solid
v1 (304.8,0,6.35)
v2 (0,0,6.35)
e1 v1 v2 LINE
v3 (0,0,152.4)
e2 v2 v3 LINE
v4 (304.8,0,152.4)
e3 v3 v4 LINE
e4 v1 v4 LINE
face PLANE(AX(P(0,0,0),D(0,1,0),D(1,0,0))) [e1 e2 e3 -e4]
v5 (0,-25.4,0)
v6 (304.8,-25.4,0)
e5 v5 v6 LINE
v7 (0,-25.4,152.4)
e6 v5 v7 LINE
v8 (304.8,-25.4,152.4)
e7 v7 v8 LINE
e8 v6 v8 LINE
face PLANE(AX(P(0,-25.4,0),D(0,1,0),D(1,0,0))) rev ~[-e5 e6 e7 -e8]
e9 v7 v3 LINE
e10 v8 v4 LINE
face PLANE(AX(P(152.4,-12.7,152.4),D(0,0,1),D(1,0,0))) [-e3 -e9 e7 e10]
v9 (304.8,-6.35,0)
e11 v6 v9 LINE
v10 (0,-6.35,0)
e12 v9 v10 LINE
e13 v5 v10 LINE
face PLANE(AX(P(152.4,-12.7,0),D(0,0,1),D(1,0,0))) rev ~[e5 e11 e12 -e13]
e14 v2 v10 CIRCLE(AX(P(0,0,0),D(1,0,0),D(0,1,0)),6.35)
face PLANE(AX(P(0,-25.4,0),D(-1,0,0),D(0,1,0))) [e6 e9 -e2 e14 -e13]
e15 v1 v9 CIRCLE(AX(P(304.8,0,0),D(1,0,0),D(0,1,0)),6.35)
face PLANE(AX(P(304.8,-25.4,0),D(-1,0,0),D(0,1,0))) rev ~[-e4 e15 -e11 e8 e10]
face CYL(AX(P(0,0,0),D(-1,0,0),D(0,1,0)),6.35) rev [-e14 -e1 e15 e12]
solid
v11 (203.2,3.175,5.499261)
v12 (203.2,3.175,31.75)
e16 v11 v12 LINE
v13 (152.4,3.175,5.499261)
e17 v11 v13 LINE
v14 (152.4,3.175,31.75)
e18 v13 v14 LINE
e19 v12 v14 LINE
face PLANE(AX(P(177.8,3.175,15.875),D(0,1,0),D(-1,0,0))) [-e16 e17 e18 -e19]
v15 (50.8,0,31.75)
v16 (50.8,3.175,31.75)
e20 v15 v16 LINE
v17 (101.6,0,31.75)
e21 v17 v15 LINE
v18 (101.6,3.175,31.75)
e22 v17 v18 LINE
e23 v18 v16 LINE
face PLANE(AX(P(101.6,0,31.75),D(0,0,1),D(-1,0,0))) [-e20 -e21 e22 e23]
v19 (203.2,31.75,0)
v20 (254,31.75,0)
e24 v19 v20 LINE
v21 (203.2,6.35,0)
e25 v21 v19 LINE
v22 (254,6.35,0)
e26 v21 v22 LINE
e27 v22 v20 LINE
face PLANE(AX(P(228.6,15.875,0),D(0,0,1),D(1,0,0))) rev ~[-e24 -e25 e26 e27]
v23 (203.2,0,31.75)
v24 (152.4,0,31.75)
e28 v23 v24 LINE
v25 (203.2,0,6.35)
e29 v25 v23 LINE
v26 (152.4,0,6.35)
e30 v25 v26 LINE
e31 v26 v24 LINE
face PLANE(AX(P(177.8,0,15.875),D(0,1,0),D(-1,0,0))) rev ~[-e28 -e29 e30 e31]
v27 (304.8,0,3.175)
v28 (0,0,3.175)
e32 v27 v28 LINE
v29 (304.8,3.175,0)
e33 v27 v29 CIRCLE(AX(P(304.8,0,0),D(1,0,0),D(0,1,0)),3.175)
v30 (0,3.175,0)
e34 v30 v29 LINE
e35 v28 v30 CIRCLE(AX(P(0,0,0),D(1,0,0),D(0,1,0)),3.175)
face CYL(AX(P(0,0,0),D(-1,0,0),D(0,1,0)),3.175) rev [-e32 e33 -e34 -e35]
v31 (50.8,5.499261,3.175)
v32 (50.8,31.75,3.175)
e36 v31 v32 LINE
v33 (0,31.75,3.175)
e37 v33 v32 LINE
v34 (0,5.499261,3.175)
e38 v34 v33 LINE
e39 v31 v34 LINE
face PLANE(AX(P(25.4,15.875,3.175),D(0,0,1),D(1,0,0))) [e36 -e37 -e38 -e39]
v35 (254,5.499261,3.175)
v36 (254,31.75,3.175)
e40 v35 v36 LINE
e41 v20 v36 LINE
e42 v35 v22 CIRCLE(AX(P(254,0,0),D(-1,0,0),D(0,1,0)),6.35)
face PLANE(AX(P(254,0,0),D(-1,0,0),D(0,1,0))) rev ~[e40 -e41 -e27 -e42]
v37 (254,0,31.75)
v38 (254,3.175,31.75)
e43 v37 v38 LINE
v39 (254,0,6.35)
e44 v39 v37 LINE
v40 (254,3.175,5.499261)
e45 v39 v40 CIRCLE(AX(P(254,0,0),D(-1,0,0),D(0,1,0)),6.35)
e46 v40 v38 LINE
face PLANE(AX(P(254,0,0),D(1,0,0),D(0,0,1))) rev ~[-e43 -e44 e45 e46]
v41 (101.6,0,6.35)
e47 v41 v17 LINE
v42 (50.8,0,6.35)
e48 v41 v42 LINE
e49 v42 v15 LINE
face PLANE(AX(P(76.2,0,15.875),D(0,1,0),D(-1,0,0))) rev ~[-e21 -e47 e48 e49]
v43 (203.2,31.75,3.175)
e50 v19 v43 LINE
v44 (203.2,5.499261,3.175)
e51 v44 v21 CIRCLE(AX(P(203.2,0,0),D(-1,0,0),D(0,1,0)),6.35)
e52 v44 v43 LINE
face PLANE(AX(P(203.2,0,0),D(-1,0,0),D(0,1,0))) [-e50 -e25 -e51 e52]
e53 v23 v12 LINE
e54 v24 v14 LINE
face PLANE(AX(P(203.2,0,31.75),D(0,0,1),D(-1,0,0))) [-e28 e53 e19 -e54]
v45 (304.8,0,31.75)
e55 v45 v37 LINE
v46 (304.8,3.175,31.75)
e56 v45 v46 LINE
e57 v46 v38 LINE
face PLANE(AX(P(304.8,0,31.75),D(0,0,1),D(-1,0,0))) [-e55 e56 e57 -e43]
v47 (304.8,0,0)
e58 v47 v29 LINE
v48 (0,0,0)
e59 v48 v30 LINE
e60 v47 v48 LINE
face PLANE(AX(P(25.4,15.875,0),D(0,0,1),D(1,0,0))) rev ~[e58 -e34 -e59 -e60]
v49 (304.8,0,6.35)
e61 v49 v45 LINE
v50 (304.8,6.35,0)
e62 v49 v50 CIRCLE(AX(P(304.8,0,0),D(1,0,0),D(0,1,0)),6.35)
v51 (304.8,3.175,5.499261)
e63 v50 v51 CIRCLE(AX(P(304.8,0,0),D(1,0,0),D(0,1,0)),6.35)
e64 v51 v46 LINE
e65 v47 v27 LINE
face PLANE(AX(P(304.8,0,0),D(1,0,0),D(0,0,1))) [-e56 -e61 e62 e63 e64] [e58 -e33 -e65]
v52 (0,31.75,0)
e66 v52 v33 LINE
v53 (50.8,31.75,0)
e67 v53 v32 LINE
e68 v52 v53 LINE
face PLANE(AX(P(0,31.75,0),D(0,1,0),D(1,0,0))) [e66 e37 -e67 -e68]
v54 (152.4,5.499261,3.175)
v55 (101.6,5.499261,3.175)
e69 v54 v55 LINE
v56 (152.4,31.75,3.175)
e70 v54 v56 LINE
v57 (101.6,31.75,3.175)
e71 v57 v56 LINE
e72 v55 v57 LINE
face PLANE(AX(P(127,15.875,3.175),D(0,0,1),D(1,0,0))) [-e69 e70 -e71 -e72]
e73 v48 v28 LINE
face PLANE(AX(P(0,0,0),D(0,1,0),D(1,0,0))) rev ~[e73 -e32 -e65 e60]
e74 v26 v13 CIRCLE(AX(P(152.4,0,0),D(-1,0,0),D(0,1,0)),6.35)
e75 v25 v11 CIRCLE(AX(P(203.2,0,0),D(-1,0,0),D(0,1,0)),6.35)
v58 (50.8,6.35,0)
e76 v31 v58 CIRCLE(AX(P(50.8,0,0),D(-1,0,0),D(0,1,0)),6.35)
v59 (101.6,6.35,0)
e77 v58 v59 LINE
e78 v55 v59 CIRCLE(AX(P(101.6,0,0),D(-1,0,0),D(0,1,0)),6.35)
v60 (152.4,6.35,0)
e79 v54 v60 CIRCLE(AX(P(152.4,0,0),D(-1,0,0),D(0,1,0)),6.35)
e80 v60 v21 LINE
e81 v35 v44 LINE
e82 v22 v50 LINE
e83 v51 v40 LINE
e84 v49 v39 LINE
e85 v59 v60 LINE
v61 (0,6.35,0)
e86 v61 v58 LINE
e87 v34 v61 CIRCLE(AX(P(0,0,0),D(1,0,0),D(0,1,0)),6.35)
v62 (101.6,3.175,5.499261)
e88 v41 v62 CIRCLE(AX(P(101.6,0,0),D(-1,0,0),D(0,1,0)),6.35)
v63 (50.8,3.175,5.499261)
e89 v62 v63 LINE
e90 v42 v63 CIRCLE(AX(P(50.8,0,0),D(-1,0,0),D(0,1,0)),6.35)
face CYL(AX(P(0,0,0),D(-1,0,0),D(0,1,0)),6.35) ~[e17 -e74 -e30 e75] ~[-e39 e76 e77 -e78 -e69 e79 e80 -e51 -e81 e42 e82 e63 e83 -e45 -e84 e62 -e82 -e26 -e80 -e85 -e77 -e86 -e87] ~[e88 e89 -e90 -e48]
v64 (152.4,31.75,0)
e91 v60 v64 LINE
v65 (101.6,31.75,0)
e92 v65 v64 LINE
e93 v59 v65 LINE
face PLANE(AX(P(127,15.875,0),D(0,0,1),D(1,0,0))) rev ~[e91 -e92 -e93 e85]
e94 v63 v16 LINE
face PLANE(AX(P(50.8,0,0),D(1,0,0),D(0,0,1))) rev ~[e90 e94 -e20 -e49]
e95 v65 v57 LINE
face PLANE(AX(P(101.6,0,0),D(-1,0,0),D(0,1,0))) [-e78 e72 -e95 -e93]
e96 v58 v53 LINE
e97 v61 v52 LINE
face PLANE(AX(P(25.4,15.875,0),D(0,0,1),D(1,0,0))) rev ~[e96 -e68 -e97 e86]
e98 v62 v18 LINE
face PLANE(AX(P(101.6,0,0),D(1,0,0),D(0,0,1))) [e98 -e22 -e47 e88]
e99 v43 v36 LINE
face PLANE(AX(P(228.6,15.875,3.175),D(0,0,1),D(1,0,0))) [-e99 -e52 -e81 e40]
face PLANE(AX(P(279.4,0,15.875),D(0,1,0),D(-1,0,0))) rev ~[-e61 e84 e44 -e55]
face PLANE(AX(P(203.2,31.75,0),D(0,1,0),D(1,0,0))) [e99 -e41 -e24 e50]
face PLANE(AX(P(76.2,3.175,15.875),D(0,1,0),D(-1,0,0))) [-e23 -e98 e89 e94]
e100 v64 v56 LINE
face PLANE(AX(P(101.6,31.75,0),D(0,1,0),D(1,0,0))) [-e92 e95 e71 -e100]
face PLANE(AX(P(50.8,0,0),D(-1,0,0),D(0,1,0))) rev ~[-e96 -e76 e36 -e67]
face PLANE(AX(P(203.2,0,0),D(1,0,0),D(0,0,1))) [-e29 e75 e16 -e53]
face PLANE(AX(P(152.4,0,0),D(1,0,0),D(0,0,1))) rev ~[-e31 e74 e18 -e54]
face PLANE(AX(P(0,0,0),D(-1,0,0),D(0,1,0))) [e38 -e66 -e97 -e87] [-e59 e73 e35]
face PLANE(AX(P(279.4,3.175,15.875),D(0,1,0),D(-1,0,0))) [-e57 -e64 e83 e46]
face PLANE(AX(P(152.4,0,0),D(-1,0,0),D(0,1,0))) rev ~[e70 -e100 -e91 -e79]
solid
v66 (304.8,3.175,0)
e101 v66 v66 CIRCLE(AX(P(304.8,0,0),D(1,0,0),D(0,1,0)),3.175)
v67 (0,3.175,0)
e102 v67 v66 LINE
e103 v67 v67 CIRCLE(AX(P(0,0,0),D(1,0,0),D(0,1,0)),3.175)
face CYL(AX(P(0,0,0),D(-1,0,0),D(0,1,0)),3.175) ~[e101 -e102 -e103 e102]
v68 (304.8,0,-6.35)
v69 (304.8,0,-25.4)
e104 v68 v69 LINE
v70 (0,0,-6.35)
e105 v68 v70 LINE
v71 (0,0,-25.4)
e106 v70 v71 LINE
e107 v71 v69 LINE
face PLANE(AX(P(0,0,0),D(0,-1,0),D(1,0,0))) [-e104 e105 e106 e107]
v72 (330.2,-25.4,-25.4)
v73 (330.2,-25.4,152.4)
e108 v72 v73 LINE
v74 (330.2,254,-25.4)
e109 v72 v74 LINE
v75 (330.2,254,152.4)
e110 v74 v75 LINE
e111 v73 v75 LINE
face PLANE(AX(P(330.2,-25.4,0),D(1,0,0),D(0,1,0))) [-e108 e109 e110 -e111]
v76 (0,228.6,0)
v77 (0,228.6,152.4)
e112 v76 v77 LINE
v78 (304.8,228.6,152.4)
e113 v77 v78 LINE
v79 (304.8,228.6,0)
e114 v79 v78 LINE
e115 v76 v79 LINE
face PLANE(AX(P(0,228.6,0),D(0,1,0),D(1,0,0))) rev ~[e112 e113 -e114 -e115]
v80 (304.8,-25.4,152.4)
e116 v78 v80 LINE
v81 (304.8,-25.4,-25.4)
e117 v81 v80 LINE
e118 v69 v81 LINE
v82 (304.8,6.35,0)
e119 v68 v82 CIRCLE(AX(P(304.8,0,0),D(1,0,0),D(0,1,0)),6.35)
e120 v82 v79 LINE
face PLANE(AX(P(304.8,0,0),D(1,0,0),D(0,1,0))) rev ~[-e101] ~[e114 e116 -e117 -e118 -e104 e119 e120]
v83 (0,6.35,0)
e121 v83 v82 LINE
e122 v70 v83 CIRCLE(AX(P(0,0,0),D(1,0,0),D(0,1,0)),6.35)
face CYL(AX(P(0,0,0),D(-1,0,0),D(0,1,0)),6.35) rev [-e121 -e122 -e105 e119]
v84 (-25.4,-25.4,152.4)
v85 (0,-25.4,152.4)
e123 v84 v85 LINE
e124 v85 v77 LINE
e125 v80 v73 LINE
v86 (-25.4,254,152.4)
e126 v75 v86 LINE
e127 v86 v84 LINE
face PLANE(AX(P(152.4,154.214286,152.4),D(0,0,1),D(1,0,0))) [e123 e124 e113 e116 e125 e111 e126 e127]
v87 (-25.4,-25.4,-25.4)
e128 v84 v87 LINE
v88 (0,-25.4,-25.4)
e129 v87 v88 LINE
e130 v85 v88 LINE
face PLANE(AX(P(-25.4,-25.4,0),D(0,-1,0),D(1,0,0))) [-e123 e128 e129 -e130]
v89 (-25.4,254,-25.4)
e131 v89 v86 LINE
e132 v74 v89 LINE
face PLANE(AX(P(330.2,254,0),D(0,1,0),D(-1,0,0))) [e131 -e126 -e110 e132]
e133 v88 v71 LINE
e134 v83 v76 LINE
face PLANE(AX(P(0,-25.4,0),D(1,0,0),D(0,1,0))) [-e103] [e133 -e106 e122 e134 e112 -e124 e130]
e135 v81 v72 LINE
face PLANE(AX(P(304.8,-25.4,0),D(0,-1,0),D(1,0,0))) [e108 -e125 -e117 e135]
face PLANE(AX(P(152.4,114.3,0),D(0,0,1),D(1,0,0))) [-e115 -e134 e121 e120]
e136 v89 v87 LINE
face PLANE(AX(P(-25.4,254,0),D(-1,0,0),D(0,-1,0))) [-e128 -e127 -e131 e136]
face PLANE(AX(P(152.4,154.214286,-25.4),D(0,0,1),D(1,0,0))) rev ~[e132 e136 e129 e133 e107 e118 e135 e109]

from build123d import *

# Parameters (mm, degrees)
F0_W          = 304.8
F0_H          = 228.6
F1_DEPTH      = 25.4
F2_DEPTH      = 152.4
F2_DEPTH_BACK = 25.4
F0_H_2        = 25.4
F3_DEPTH      = 152.4
F4_R          = 6.35
F4_R_2        = 3.175
F5_DEPTH      = 304.8
F6_DEPTH      = 304.8
F7_DEPTH      = 304.8
F8_W          = 50.8
F8_H          = 31.75
F10_DEPTH     = 3.175
F9_W          = 50.8
F9_H          = 31.75
F9_W_2        = 50.8000000005
F11_DEPTH     = 3.175


with BuildPart() as f1:
    # F0 (on Top) → F1 (new body)
    with BuildSketch(Plane.XY):
        with Locations((152.4, 114.3)):
            Rectangle(F0_W, F0_H)
    extrude(amount=-F1_DEPTH)

    # F0 (on Top) → F2 (join, two sides)
    with BuildSketch(Plane.XY) as f2_sk:
        Polygon((0, -25.4), (0, 0), (0, 228.6), (304.8, 228.6), (304.8, 0), (304.8, -25.4), (330.2, -25.4), (330.2, 254), (-25.4, 254), (-25.4, -25.4), align=None)
    extrude(amount=F2_DEPTH)
    extrude(f2_sk.sketch, amount=-F2_DEPTH_BACK)


with BuildPart() as f3:
    # F0 (on Top) → F3 (new body)
    with BuildSketch(Plane.XY):
        with Locations((152.4, -12.7)):
            Rectangle(F0_W, F0_H_2)
    extrude(amount=F3_DEPTH)


with BuildPart() as f5_tool:
    # F4 (on Right) → F5 (new body, through all)
    with BuildSketch(Plane.YZ):
        Circle(F4_R)
        Circle(F4_R_2, mode=Mode.SUBTRACT)
        Circle(F4_R_2)
    extrude(amount=F5_DEPTH)


with BuildPart() as f1_1:
    add(f1.part)

    # F5: cut by f5_tool
    add(f5_tool.part, mode=Mode.SUBTRACT)

    # F4 (on Right) → F6 (join, through all)
    with BuildSketch(Plane.YZ):
        Circle(F4_R_2)
    extrude(amount=F6_DEPTH)


with BuildPart() as f3_1:
    add(f3.part)

    # F5: cut by f5_tool
    add(f5_tool.part, mode=Mode.SUBTRACT)


with BuildPart() as f7:
    # F4 (on Right) → F7 (new body, through all)
    with BuildSketch(Plane.YZ):
        Circle(F4_R)
        Circle(F4_R_2, mode=Mode.SUBTRACT)
    extrude(amount=F7_DEPTH)

    # F8 (on face) → F10 (join)
    with BuildSketch(Plane(origin=(0, 0, 0), x_dir=(-1, 0, 0), z_dir=(0, 1, 0))):
        with Locations((-279.4, 15.875)):
            Rectangle(F8_W, F8_H)
        with Locations((-177.8, 15.875)):
            Rectangle(F8_W, F8_H)
        with Locations((-76.2, 15.875)):
            Rectangle(F8_W, F8_H)
    extrude(amount=F10_DEPTH)

    # F9 (on face) → F11 (join)
    with BuildSketch(Plane.XY):
        with Locations((25.4, 15.875)):
            Rectangle(F9_W, F9_H)
        with Locations((127.0000000002, 15.875)):
            Rectangle(F9_W_2, F9_H)
        with Locations((228.6, 15.875)):
            Rectangle(F9_W, F9_H)
    extrude(amount=F11_DEPTH)


solid = Compound([f1_1.part, f3_1.part, f7.part])
